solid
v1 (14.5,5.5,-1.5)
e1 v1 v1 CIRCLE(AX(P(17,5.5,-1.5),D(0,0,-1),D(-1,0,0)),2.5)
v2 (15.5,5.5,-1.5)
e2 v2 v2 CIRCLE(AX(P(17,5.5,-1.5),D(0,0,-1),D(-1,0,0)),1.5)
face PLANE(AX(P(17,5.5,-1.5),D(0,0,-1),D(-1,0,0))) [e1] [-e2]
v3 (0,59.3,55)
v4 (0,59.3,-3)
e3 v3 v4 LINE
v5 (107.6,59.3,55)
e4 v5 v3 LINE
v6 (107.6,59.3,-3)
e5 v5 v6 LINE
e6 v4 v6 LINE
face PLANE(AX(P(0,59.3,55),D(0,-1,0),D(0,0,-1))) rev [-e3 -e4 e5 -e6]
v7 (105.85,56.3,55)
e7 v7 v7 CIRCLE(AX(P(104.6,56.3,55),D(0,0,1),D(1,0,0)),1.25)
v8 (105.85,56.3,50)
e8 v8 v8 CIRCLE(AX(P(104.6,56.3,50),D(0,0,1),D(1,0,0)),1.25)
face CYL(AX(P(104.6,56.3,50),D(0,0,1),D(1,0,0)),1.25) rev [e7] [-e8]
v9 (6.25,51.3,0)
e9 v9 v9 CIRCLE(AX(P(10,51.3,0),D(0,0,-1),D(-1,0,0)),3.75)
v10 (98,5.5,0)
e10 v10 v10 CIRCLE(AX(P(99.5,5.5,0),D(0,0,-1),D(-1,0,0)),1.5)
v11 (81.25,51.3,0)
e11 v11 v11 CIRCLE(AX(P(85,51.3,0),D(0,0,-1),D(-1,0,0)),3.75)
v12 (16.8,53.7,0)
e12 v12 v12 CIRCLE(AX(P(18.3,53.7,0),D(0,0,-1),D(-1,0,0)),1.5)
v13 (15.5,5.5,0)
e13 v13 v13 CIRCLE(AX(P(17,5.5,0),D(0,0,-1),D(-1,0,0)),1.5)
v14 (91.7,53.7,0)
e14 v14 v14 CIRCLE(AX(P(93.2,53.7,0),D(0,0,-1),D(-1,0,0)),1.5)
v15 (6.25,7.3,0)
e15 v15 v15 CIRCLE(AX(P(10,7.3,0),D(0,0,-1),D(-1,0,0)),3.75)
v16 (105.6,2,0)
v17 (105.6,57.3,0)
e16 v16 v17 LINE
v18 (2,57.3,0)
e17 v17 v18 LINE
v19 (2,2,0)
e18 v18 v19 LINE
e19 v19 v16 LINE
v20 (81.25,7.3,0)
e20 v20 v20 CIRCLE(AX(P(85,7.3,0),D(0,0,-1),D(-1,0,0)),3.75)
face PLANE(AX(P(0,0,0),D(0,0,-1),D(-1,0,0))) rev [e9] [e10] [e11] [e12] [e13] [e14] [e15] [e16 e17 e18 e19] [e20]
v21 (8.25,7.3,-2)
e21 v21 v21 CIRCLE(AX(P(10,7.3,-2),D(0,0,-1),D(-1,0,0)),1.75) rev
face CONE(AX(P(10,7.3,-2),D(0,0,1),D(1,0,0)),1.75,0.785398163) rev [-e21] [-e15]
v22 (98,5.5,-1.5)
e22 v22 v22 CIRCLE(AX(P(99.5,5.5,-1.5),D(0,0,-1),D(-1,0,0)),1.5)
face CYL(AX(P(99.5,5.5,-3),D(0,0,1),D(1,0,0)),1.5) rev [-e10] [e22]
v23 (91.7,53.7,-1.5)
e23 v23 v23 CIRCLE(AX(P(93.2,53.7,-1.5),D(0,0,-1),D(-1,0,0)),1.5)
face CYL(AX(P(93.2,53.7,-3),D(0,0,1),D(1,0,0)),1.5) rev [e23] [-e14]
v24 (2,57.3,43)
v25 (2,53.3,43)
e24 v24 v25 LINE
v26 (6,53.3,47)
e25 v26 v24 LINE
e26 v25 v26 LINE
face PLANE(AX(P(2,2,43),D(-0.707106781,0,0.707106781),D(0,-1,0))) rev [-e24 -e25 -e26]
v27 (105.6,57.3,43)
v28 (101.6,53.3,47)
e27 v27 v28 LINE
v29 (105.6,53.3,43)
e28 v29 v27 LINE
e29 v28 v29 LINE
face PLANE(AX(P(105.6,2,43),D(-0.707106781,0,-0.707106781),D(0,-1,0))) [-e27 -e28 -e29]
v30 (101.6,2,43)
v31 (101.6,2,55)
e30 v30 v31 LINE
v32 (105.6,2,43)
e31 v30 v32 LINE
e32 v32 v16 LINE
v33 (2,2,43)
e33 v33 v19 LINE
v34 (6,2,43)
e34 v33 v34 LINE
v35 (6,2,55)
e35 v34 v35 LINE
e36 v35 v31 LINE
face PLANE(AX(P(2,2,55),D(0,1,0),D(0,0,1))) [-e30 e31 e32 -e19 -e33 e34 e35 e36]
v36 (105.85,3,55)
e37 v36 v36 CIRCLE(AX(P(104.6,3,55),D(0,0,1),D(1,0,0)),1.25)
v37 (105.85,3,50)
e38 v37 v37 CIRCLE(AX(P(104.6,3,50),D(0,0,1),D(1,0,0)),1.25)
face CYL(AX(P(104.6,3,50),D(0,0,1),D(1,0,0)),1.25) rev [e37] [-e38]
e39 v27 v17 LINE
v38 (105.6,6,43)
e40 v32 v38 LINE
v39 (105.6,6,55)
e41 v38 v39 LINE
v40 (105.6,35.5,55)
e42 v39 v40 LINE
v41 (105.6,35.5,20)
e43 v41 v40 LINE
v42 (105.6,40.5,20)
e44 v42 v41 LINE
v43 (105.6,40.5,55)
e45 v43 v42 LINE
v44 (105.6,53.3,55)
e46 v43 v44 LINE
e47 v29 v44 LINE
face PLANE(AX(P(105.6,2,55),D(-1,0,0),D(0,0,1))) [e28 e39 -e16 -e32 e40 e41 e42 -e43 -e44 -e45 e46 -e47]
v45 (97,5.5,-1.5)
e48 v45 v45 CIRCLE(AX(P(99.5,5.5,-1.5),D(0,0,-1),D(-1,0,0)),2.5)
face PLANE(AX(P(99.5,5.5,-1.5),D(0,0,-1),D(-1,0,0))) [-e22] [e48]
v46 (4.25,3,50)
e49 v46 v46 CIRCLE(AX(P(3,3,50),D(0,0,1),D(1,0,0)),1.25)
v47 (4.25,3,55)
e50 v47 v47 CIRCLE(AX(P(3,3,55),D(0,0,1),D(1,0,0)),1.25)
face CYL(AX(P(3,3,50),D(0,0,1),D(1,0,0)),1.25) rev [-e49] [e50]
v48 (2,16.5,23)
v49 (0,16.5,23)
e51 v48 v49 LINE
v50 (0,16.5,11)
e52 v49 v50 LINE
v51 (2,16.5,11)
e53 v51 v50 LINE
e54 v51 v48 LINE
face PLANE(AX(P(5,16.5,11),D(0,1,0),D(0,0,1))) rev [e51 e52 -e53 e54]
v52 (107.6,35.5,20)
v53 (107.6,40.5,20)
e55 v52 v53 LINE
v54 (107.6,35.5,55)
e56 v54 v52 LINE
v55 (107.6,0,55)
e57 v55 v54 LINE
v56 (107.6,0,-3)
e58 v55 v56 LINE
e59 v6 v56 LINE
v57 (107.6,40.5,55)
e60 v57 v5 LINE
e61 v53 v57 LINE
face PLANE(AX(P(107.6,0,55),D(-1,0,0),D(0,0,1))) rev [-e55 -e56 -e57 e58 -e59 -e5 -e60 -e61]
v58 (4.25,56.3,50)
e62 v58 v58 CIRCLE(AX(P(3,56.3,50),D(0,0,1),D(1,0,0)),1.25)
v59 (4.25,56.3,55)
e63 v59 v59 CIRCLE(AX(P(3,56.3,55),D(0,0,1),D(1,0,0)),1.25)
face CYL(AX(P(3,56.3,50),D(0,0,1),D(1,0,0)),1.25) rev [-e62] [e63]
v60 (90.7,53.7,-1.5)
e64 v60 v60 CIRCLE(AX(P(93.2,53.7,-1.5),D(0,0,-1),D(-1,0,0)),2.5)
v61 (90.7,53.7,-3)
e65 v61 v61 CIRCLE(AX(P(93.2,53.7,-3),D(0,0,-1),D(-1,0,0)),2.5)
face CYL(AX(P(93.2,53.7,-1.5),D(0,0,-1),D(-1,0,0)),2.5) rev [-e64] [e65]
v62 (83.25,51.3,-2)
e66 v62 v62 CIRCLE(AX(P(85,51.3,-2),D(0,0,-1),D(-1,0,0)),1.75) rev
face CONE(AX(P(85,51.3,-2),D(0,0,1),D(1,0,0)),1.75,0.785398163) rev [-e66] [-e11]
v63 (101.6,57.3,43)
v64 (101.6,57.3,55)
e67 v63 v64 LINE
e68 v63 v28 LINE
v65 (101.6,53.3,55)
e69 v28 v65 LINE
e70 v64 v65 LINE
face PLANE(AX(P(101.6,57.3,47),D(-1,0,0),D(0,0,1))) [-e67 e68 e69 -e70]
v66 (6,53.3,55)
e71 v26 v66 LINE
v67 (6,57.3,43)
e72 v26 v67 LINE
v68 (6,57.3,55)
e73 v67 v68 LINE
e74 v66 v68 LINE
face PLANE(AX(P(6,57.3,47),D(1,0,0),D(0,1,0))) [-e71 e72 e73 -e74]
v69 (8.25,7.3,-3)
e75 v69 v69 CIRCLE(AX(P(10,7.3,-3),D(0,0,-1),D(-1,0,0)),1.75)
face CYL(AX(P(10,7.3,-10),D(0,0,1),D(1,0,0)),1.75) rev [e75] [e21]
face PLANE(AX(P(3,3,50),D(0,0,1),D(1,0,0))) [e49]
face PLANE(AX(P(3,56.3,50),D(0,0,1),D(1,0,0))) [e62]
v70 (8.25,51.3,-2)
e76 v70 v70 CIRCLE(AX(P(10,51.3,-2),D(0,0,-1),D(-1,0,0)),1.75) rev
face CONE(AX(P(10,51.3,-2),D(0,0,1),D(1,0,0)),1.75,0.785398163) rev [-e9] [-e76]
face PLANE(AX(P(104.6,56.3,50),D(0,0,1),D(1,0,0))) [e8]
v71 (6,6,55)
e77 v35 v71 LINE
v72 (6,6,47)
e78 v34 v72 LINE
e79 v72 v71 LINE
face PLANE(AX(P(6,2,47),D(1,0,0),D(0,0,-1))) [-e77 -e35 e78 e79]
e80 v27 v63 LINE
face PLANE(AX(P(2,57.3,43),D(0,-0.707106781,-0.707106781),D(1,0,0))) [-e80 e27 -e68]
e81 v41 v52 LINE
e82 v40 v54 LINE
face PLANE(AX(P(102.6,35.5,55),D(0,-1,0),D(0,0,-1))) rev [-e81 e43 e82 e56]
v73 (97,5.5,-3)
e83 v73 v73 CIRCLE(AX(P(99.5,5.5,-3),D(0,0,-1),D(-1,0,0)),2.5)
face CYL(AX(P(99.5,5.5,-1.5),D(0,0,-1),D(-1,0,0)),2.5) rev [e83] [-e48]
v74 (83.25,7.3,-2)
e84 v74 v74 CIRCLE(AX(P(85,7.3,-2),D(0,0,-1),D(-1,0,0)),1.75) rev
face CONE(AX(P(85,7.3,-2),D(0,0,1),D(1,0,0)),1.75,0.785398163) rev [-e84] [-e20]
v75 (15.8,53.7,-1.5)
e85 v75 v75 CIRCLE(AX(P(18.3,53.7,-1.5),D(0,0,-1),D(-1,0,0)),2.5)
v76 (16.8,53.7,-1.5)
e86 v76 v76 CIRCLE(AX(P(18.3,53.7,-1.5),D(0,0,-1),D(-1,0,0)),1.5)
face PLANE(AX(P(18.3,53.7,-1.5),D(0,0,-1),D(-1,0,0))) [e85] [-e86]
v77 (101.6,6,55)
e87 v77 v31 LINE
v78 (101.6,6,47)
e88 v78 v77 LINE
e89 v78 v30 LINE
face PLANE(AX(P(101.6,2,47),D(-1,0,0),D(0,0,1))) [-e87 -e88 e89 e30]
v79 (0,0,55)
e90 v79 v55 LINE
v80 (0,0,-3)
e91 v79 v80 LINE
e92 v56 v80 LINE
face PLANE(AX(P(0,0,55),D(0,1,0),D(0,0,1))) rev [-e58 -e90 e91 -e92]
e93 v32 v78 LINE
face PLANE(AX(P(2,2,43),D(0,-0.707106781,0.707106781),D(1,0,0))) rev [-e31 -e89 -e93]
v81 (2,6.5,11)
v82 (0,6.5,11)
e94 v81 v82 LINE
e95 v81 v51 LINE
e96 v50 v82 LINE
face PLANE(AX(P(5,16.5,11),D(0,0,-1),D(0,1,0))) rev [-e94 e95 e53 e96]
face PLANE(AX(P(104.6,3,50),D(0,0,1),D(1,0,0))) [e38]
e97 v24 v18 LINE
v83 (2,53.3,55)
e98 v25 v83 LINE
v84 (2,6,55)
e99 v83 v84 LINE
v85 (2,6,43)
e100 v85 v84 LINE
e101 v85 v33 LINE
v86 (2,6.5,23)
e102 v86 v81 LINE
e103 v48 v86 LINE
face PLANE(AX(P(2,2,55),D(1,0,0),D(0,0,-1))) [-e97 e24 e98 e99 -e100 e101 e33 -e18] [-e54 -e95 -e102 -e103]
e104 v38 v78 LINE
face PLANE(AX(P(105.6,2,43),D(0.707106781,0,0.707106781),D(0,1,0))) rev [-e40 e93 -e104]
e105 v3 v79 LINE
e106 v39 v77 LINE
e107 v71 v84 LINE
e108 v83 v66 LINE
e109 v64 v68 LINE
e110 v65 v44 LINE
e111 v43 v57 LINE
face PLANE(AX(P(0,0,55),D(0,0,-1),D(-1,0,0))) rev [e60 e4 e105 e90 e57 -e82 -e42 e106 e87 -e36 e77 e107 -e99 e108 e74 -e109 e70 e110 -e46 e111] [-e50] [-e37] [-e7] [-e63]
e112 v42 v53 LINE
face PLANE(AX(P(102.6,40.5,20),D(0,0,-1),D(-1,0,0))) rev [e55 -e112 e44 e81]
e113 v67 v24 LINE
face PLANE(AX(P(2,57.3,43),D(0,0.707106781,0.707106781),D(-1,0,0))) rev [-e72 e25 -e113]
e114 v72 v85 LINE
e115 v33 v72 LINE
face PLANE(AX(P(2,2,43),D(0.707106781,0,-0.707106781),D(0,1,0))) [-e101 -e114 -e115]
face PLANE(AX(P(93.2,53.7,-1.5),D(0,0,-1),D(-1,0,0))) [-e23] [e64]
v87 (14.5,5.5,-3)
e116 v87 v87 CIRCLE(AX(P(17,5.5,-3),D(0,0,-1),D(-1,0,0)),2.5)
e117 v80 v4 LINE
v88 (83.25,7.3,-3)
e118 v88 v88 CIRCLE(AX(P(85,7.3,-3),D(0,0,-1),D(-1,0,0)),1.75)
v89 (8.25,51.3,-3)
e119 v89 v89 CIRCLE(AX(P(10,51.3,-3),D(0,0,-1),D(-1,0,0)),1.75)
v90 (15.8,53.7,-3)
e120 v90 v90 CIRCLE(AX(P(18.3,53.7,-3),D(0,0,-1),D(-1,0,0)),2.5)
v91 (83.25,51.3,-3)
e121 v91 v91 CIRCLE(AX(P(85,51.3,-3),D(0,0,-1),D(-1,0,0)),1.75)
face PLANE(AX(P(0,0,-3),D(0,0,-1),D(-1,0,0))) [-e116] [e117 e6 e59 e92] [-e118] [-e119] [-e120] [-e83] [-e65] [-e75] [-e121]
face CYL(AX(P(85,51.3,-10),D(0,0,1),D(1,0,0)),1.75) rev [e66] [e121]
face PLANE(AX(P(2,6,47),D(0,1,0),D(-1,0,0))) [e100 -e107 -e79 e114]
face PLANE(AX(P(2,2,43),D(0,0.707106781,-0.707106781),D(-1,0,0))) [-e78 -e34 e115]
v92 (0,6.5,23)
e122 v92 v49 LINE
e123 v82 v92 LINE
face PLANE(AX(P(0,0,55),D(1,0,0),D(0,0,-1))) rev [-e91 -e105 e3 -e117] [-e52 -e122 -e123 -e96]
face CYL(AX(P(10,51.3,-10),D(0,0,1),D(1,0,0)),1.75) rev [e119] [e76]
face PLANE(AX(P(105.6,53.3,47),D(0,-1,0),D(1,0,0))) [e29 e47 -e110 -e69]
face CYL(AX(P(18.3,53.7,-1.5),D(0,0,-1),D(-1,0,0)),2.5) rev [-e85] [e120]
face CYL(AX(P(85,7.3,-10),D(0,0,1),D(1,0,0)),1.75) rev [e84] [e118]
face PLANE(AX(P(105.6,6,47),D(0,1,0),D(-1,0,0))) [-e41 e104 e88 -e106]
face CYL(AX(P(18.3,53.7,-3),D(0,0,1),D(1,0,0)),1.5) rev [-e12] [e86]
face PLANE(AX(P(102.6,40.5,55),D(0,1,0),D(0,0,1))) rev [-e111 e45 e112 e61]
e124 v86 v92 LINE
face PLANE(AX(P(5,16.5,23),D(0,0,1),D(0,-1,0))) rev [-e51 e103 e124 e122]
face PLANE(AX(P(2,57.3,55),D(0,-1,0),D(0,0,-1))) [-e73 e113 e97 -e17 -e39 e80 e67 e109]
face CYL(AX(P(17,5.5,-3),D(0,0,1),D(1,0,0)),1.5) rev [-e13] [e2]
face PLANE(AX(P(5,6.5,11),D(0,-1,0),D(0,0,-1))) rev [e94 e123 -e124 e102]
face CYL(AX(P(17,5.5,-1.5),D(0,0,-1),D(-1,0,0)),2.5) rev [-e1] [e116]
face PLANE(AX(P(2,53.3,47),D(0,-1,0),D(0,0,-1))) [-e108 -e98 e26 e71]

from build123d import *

# Parameters (mm, degrees)
SKETCH1_W           = 107.6
SKETCH1_H           = 59.3
SKETCH1_W_2         = 103.6
SKETCH1_H_2         = 55.3
BOSS_EXTRUDE1_DEPTH = 55
SKETCH2_W           = 107.6
SKETCH2_H           = 59.3
SKETCH2_R           = 1.5
BOSS_EXTRUDE2_DEPTH = 3
SKETCH3_R           = 2.5
CUT_EXTRUDE1_DEPTH  = 1.5
SKETCH4_W           = 12
SKETCH4_H           = 10
CUT_EXTRUDE2_DEPTH  = 5
SKETCH5_W           = 35
SKETCH5_H           = 5
CUT_EXTRUDE3_DEPTH  = 5
SKETCH8_R           = 1.75
CUT_EXTRUDE4_DEPTH  = 10
CHAMFER1_SIZE       = 2
SKETCH9_W           = 4
SKETCH9_H           = 4
BOSS_EXTRUDE4_DEPTH = 8
CHAMFER2_SIZE       = 4
SKETCH10_R          = 1.25
CUT_EXTRUDE5_DEPTH  = 5


with BuildPart() as part:
    # Sketch1 → Boss-Extrude1 (new body)
    with BuildSketch(Plane.XY):
        with Locations((53.8, 29.65)):
            Rectangle(SKETCH1_W, SKETCH1_H)
        with Locations((53.8, 29.65)):
            Rectangle(SKETCH1_W_2, SKETCH1_H_2, mode=Mode.SUBTRACT)
    extrude(amount=BOSS_EXTRUDE1_DEPTH)

    # Sketch2 → Boss-Extrude2 (add)
    with BuildSketch(Plane(origin=(0, 0, 0), x_dir=(-1, 0, 0), z_dir=(0, 0, -1))):
        with Locations((-53.8, 29.65)):
            Rectangle(SKETCH2_W, SKETCH2_H)
        with Locations((-18.3, 53.7)):
            Circle(SKETCH2_R, mode=Mode.SUBTRACT)
        with Locations((-17, 5.5)):
            Circle(SKETCH2_R, mode=Mode.SUBTRACT)
        with Locations((-93.2, 53.7)):
            Circle(SKETCH2_R, mode=Mode.SUBTRACT)
        with Locations((-99.5, 5.5)):
            Circle(SKETCH2_R, mode=Mode.SUBTRACT)
    extrude(amount=BOSS_EXTRUDE2_DEPTH)

    # Sketch3 → Cut-Extrude1 (cut)
    with BuildSketch(Plane(origin=(0, 0, -3), x_dir=(-1, 0, 0), z_dir=(0, 0, -1))):
        with Locations((-93.2, 53.7)):
            Circle(SKETCH3_R)
        with Locations((-18.3, 53.7)):
            Circle(SKETCH3_R)
        with Locations((-17, 5.5)):
            Circle(SKETCH3_R)
        with Locations((-99.5, 5.5)):
            Circle(SKETCH3_R)
    extrude(amount=-CUT_EXTRUDE1_DEPTH, mode=Mode.SUBTRACT)

    # Sketch4 → Cut-Extrude2 (cut)
    with BuildSketch(Plane.ZY):
        with Locations((17, 11.5)):
            Rectangle(SKETCH4_W, SKETCH4_H)
    extrude(amount=-CUT_EXTRUDE2_DEPTH, mode=Mode.SUBTRACT)

    # Sketch5 → Cut-Extrude3 (cut)
    with BuildSketch(Plane(origin=(107.6, 0, 0), x_dir=(0, 0, -1), z_dir=(1, 0, 0))):
        with Locations((-37.5, 38)):
            Rectangle(SKETCH5_W, SKETCH5_H)
    extrude(amount=-CUT_EXTRUDE3_DEPTH, mode=Mode.SUBTRACT)

    # Sketch8 → Cut-Extrude4 (cut)
    with BuildSketch(Plane.XY):
        with Locations((10, 51.3)):
            Circle(SKETCH8_R)
        with Locations((85, 51.3)):
            Circle(SKETCH8_R)
        with Locations((85, 7.3)):
            Circle(SKETCH8_R)
        with Locations((10, 7.3)):
            Circle(SKETCH8_R)
    extrude(amount=-CUT_EXTRUDE4_DEPTH, mode=Mode.SUBTRACT)

    # Chamfer1
    chamfer1_edges = [part.edges().sort_by_distance(p)[0] for p in [
        (8.25, 7.3, 0),
        (83.25, 7.3, 0),
        (83.25, 51.3, 0),
        (8.25, 51.3, 0),
    ]]
    chamfer(chamfer1_edges, length=CHAMFER1_SIZE)

    # Sketch9 → Boss-Extrude4 (add)
    with BuildSketch(Plane.XY.offset(55)):
        with Locations((4, 4)):
            Rectangle(SKETCH9_W, SKETCH9_H)
        with Locations((103.6, 55.3)):
            Rectangle(SKETCH9_W, SKETCH9_H)
        with Locations((103.6, 4)):
            Rectangle(SKETCH9_W, SKETCH9_H)
        with Locations((4, 55.3)):
            Rectangle(SKETCH9_W, SKETCH9_H)
    extrude(amount=-BOSS_EXTRUDE4_DEPTH)

    # Chamfer2
    chamfer2_edges = [part.edges().sort_by_distance(p)[0] for p in [
        (4, 57.3, 47),
        (2, 55.3, 47),
        (4, 2, 47),
        (2, 4, 47),
        (105.6, 4, 47),
        (103.6, 2, 47),
        (103.6, 57.3, 47),
        (105.6, 55.3, 47),
    ]]
    chamfer(chamfer2_edges, length=CHAMFER2_SIZE - 0.0001)  # a hair under: the kernel refuses the full size

    # Sketch10 → Cut-Extrude5 (cut)
    with BuildSketch(Plane.XY.offset(55)):
        with Locations((3, 56.3)):
            Circle(SKETCH10_R)
        with Locations((104.6, 56.3)):
            Circle(SKETCH10_R)
        with Locations((104.6, 3)):
            Circle(SKETCH10_R)
        with Locations((3, 3)):
            Circle(SKETCH10_R)
    extrude(amount=-CUT_EXTRUDE5_DEPTH, mode=Mode.SUBTRACT)


solid = part.part
